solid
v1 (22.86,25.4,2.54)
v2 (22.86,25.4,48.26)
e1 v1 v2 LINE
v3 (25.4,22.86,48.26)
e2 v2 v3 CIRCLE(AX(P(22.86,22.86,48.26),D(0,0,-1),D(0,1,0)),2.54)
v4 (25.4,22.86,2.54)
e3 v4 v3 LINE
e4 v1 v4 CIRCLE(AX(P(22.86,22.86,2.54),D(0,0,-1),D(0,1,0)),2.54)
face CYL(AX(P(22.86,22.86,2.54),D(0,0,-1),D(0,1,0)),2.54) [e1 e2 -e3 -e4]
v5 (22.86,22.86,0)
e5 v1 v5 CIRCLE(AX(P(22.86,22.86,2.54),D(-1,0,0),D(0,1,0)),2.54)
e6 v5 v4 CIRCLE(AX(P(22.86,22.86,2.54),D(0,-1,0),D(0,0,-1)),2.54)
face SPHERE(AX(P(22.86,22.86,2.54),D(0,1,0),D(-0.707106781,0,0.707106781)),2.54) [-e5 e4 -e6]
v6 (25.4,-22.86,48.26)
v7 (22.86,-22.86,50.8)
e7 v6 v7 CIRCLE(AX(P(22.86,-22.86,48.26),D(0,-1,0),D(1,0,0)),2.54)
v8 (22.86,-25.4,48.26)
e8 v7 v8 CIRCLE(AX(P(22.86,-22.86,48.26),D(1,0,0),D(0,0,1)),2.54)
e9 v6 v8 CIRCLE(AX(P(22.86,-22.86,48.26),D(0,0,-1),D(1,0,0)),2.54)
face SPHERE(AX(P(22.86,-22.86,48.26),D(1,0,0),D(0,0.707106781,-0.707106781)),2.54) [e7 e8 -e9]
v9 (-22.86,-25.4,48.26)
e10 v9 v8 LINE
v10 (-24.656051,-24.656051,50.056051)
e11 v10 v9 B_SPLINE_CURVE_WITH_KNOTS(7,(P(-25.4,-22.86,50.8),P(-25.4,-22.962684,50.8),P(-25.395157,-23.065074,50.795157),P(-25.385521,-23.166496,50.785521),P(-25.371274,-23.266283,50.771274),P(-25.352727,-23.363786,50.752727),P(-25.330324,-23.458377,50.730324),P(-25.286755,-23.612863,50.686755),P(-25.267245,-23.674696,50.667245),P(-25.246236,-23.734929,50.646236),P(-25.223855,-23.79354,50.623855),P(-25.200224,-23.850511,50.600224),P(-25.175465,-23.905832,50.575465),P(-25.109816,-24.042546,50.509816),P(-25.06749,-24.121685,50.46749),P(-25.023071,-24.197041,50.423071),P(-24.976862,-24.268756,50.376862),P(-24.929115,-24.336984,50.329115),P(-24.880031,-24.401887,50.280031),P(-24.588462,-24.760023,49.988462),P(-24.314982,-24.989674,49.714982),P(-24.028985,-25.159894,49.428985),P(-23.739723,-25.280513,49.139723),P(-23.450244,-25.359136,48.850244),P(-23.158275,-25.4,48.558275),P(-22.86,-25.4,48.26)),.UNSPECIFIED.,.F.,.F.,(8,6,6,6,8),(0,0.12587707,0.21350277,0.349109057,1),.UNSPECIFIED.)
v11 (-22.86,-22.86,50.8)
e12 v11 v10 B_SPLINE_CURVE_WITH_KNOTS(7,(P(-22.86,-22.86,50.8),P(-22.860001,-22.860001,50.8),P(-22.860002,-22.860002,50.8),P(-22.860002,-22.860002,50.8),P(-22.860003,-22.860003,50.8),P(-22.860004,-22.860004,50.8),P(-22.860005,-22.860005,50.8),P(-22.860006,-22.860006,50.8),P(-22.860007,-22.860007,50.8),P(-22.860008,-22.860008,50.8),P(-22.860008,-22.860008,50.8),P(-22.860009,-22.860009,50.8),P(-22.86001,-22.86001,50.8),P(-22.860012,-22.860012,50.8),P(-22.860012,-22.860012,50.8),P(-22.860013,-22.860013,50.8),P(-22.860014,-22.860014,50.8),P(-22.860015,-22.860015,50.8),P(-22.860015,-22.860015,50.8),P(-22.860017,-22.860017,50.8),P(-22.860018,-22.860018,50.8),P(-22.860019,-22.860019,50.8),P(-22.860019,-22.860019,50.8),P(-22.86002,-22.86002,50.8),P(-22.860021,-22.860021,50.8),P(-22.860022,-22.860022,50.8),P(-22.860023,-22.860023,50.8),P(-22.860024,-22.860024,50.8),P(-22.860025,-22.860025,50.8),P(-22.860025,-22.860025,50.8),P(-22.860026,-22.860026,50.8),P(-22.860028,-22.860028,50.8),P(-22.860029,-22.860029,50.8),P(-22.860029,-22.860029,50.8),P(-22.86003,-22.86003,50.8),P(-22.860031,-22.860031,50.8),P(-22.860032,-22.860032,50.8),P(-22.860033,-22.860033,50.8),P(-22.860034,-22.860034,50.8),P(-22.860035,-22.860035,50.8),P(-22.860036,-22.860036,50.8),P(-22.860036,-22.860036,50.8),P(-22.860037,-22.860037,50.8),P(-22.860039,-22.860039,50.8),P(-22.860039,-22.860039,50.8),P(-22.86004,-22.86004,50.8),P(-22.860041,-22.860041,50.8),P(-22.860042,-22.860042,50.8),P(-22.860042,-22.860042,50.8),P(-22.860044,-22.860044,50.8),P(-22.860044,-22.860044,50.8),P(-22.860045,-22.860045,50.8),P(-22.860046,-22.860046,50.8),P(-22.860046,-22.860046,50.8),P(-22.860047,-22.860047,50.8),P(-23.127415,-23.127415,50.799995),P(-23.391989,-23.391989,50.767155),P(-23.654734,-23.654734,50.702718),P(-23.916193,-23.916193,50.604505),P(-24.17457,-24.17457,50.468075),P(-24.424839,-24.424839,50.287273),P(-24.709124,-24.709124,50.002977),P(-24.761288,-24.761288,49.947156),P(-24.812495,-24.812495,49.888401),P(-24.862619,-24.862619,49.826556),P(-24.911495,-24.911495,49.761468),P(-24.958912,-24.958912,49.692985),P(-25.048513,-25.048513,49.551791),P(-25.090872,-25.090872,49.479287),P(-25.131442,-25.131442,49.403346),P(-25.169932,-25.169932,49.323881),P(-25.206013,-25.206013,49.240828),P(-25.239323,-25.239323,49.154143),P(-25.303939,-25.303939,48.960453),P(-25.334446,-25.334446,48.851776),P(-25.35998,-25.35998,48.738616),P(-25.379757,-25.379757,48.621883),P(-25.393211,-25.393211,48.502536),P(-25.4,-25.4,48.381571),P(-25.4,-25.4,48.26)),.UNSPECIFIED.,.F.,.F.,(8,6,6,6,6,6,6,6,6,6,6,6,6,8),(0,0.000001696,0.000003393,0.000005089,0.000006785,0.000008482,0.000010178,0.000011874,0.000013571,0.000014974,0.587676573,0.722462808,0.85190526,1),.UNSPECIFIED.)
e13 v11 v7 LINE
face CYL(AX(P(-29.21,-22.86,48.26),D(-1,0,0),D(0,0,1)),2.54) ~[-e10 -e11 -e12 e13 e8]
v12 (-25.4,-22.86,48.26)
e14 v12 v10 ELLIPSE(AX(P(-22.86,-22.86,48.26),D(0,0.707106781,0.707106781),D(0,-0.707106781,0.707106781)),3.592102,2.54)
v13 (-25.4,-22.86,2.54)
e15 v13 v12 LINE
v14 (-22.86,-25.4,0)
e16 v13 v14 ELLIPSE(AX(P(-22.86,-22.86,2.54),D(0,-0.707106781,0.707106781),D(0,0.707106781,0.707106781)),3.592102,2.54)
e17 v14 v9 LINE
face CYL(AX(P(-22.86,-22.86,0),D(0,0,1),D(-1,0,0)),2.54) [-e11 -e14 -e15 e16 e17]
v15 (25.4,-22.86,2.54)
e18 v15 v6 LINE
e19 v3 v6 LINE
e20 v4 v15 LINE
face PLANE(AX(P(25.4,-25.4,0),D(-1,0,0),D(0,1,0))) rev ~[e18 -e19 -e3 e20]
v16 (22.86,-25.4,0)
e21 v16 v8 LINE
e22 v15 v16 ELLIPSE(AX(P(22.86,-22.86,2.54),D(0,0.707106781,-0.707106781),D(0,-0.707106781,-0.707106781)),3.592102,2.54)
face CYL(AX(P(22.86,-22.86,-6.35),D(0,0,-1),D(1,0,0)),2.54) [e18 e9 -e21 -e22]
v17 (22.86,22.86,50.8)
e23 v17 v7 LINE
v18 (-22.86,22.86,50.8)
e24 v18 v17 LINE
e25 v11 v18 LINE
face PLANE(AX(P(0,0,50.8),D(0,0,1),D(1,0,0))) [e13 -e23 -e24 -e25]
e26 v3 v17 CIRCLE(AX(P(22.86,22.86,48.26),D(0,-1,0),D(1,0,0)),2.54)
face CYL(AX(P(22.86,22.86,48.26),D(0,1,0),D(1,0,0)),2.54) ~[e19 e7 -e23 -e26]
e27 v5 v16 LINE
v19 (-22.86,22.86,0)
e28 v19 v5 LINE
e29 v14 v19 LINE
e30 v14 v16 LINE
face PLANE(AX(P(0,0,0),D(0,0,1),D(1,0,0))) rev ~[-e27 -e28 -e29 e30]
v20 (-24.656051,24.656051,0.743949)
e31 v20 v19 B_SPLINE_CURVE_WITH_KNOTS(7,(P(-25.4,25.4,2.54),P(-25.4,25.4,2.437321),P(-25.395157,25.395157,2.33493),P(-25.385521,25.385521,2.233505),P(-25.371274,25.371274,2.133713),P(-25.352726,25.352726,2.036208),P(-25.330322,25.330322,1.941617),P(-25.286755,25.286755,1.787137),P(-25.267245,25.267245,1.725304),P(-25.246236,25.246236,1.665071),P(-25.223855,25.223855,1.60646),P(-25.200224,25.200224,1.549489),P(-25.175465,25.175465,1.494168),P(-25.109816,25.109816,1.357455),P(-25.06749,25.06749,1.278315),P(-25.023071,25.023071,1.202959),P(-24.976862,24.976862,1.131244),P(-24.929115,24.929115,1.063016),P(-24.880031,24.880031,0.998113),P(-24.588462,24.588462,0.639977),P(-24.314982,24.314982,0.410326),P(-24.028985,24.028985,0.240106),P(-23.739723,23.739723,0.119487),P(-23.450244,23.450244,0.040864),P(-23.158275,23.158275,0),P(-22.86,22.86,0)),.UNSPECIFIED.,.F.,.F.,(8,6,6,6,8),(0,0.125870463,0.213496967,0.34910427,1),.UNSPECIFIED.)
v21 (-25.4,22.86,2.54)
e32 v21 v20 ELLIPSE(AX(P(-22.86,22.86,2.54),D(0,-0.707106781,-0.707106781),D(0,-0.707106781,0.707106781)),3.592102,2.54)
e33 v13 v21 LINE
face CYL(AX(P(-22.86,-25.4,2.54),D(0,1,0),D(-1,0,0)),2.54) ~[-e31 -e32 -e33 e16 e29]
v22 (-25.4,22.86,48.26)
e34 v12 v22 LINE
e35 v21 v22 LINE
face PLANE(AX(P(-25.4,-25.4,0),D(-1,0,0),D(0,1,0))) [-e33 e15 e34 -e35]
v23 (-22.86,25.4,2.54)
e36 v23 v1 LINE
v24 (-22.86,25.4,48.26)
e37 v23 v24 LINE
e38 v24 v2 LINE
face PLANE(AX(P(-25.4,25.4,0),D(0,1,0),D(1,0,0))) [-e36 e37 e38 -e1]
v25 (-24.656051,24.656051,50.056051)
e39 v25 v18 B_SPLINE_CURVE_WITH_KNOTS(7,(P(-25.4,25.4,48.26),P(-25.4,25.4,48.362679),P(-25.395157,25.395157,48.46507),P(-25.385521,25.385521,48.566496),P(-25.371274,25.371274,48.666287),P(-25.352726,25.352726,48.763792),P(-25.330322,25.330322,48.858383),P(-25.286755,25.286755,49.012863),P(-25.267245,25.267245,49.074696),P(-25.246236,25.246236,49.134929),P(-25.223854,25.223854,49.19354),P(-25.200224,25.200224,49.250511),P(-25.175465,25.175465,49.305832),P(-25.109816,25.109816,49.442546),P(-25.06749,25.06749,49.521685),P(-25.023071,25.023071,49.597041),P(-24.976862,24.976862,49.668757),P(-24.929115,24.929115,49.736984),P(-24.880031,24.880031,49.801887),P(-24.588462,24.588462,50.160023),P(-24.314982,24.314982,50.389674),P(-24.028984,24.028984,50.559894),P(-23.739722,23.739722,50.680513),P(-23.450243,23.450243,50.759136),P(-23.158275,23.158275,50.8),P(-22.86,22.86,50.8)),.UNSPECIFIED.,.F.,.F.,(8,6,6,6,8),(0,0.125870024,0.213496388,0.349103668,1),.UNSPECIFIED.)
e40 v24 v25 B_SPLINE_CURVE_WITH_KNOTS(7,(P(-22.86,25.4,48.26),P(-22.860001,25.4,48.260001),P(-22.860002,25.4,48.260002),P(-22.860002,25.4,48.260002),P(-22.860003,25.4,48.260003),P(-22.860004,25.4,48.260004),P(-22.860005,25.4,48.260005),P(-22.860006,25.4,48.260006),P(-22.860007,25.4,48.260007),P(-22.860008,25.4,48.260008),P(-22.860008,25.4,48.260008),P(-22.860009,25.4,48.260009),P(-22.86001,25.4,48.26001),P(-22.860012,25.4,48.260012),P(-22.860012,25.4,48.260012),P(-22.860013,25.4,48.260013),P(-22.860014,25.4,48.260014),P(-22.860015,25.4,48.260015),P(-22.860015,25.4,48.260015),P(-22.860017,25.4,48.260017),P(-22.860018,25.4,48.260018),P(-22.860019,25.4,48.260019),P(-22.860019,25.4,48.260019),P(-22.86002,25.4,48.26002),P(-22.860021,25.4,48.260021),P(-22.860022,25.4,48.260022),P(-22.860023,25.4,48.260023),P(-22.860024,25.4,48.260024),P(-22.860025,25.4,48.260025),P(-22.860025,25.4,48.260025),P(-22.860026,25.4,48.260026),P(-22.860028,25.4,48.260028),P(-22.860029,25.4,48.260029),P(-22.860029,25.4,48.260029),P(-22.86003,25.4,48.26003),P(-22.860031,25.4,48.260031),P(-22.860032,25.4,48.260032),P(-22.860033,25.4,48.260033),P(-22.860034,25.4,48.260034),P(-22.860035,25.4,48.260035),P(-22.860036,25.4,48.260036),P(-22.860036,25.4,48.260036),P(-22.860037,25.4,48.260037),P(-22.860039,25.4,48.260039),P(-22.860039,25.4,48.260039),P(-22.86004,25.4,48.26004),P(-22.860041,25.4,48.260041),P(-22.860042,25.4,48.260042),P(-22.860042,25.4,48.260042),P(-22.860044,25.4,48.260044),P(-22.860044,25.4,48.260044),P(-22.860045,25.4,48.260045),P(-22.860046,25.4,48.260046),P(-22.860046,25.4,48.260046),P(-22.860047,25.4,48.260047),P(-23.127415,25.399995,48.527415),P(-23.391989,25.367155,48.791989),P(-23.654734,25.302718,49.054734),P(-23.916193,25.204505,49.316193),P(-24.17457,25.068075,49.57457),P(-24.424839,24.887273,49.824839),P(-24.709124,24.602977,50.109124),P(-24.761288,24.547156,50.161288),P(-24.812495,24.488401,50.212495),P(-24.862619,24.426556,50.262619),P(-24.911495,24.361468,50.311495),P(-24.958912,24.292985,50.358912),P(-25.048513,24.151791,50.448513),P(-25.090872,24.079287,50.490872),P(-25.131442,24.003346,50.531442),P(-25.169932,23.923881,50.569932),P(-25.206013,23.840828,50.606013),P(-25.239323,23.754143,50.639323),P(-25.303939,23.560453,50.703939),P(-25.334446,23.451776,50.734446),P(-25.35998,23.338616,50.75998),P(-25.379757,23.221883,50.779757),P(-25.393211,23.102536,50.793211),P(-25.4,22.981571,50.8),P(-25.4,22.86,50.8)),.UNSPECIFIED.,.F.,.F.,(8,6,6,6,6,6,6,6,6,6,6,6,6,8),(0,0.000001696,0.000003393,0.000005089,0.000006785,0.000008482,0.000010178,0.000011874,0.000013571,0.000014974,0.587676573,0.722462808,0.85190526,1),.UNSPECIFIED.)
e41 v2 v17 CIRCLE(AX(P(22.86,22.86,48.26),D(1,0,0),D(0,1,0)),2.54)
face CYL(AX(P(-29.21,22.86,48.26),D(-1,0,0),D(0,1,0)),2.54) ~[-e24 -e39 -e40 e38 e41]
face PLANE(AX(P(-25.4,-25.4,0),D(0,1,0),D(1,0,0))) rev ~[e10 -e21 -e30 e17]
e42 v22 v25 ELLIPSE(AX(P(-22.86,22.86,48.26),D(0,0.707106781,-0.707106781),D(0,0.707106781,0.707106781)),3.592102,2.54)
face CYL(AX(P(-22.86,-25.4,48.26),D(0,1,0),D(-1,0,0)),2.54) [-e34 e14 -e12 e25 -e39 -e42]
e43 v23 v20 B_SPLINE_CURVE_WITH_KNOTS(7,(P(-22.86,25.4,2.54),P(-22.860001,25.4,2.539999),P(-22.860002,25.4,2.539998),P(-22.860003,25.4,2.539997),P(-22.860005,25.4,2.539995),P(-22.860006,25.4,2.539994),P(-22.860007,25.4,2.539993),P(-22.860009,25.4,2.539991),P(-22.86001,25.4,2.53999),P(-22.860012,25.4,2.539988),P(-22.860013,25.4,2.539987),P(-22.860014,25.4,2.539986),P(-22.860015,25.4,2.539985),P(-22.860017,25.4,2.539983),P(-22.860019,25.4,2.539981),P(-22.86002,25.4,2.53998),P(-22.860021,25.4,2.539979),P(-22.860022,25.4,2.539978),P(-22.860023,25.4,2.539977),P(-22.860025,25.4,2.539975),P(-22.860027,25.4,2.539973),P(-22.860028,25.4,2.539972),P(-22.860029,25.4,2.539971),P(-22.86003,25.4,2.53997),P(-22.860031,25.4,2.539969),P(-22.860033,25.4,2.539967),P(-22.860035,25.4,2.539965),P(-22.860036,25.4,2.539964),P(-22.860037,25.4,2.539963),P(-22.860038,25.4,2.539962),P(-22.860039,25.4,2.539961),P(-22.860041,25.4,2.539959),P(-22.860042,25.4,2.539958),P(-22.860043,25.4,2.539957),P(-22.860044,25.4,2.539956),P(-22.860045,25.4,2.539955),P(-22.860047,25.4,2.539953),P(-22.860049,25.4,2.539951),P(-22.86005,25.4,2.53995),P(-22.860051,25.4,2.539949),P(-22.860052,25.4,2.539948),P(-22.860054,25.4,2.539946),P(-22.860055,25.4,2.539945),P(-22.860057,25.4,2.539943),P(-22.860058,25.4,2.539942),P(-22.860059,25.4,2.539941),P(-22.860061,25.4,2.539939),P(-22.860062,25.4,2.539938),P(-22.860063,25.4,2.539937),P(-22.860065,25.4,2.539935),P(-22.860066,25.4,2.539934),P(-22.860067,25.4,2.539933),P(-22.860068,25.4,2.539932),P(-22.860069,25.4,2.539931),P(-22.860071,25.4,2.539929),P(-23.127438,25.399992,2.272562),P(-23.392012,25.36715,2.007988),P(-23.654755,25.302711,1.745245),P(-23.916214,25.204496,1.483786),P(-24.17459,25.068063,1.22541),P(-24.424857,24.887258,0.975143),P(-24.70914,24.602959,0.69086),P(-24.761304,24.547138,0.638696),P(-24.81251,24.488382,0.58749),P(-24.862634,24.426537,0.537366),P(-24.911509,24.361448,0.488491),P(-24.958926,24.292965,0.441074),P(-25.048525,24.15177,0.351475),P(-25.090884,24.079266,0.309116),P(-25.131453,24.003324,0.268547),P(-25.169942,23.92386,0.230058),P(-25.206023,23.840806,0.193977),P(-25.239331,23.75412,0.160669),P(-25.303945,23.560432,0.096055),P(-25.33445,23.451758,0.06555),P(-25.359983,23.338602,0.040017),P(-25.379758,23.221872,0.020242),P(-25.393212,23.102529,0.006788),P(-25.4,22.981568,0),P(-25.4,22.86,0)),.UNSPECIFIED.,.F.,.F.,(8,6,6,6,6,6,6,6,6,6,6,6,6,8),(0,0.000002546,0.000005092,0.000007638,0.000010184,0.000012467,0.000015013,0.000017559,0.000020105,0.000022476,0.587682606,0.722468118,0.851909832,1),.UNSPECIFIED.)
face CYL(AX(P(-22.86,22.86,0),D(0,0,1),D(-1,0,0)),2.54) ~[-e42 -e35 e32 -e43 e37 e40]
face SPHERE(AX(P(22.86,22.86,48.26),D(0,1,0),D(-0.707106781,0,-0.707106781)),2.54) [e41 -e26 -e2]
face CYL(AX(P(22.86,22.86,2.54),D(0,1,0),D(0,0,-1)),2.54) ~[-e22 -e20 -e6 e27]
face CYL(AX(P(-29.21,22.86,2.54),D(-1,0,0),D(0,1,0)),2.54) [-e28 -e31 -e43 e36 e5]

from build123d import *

# Parameters (mm, degrees)
F0_W         = 50.8
F0_H         = 50.8
F1_DEPTH     = 50.8
F2_R         = 2.54
F3_T1_DEPTH  = 52.07
F3_T3_DEPTH  = 45.72
F3_T5_DEPTH  = 54.61
F3_T7_DEPTH  = 45.72
F3_T9_DEPTH  = 54.61
F3_S13_W     = 2.5908
F3_S13_H     = 2.5908
F3_T14_DEPTH = 2.5908
F3_S19_W     = 2.5908
F3_S19_H     = 2.5908
F3_T20_DEPTH = 2.5908
F3_S25_W     = 2.5908
F3_S25_H     = 2.5908
F3_T26_DEPTH = 2.5908


# Not quite as in the source:
# - a fillet or chamfer that OpenCascade refuses, or shapes differently, is made with other operations: its cross-section is extruded or revolved along the edge and cut away or added


with BuildPart() as f1:
    # F0 (on Top) → F1 (new body)
    with BuildSketch(Plane.XY):
        Rectangle(F0_W, F0_H)
    extrude(amount=F1_DEPTH)

    # F2
    f2_edges = [f1.edges().sort_by_distance(p)[0] for p in [
        (-25.4, 25.4, 25.4),
        (-25.4, -25.4, 25.4),
        (-25.4, 0, 0),
        (-25.4, 0, 50.8),
    ]]
    fillet(f2_edges, radius=F2_R)

    # F3: fillet of radius 2.54 on 9 edges, made by hand

    # F3_s2 → F3_t1 (cut)
    with BuildSketch(Plane.YZ.offset(-29.21)):
        with BuildLine():
            ThreePointArc((25.4, 48.26), (24.6560512242, 50.0560512242), (22.86, 50.8))
            Line((22.86, 50.8), (25.4, 50.8))
            Line((25.4, 50.8), (25.4, 48.26))
        make_face()
        with BuildLine():
            ThreePointArc((-22.86, 50.8), (-24.6560512242, 50.0560512242), (-25.4, 48.26))
            Line((-25.4, 48.26), (-25.4, 50.8))
            Line((-25.4, 50.8), (-22.86, 50.8))
        make_face()
        with BuildLine():
            ThreePointArc((25.4, 2.54), (24.6560512242, 0.7439487758), (22.86, 0))
            Line((22.86, 0), (25.4, 0))
            Line((25.4, 0), (25.4, 2.54))
        make_face()
    extrude(amount=F3_T1_DEPTH, mode=Mode.SUBTRACT)

    # F3_s4 → F3_t3 (cut)
    with BuildSketch(Plane.XZ.offset(-22.86)):
        with BuildLine():
            ThreePointArc((25.4, 48.26), (24.6560512242, 50.0560512242), (22.86, 50.8))
            Line((22.86, 50.8), (25.4, 50.8))
            Line((25.4, 50.8), (25.4, 48.26))
        make_face()
    extrude(amount=F3_T3_DEPTH, mode=Mode.SUBTRACT)

    # F3_s6 → F3_t5 (cut)
    with BuildSketch(Plane.XY.offset(-6.35)):
        with BuildLine():
            ThreePointArc((25.4, -22.86), (24.6560512242, -24.6560512242), (22.86, -25.4))
            Line((22.86, -25.4), (25.4, -25.4))
            Line((25.4, -25.4), (25.4, -22.86))
        make_face()
    extrude(amount=F3_T5_DEPTH, mode=Mode.SUBTRACT)

    # F3_s8 → F3_t7 (cut)
    with BuildSketch(Plane.XY.offset(2.54)):
        with BuildLine():
            ThreePointArc((22.86, 25.4), (24.6560512242, 24.6560512242), (25.4, 22.86))
            Line((25.4, 22.86), (25.4, 25.4))
            Line((25.4, 25.4), (22.86, 25.4))
        make_face()
    extrude(amount=F3_T7_DEPTH, mode=Mode.SUBTRACT)

    # F3_s10 → F3_t9 (cut)
    with BuildSketch(Plane.XZ.offset(-22.86)):
        with BuildLine():
            ThreePointArc((22.86, 0), (24.6560512242, 0.7439487758), (25.4, 2.54))
            Line((25.4, 2.54), (25.4, 0))
            Line((25.4, 0), (22.86, 0))
        make_face()
    extrude(amount=F3_T9_DEPTH, mode=Mode.SUBTRACT)


with BuildPart() as f3_tool12:
    # F3_s13 → F3_t14 (new body)
    with BuildSketch(Plane.XZ.offset(-22.86)):
        with Locations((24.1554, 49.5554)):
            Rectangle(F3_S13_W, F3_S13_H)
    extrude(amount=-F3_T14_DEPTH)

    # F3_s15 → F3_t16 (revolve, cut)
    with BuildSketch(Plane(origin=(22.86, 22.86, 48.26), x_dir=(-0.7071067812, 0, -0.7071067812), z_dir=(0.7071067812, 0, -0.7071067812))):
        with BuildLine():
            ThreePointArc((0, -2.54), (2.54, 0), (0, 2.54))
            Line((0, 2.54), (0, -2.54))
        make_face()
    revolve(axis=Axis((22.86, 22.86, 48.26), (0, 1, 0)), mode=Mode.SUBTRACT)


with BuildPart() as f1_1:
    add(f1.part)

    # F3_t11: cut F3_tool12
    add(f3_tool12.part, mode=Mode.SUBTRACT)


with BuildPart() as f3_tool18:
    # F3_s19 → F3_t20 (new body)
    with BuildSketch(Plane.YZ.offset(22.86)):
        with Locations((-24.1554, 49.5554)):
            Rectangle(F3_S19_W, F3_S19_H)
    extrude(amount=F3_T20_DEPTH)

    # F3_s21 → F3_t22 (revolve, cut)
    with BuildSketch(Plane(origin=(22.86, -22.86, 48.26), x_dir=(0, 0.7071067812, -0.7071067812), z_dir=(0, -0.7071067812, -0.7071067812))):
        with BuildLine():
            ThreePointArc((0, -2.54), (2.54, 0), (0, 2.54))
            Line((0, 2.54), (0, -2.54))
        make_face()
    revolve(axis=Axis((22.86, -22.86, 48.26), (1, 0, 0)), mode=Mode.SUBTRACT)


with BuildPart() as f1_2:
    add(f1_1.part)

    # F3_t17: cut F3_tool18
    add(f3_tool18.part, mode=Mode.SUBTRACT)


with BuildPart() as f3_tool24:
    # F3_s25 → F3_t26 (new body)
    with BuildSketch(Plane.XZ.offset(-22.86)):
        with Locations((24.1554, 1.2446)):
            Rectangle(F3_S25_W, F3_S25_H)
    extrude(amount=-F3_T26_DEPTH)

    # F3_s27 → F3_t28 (revolve, cut)
    with BuildSketch(Plane(origin=(22.86, 22.86, 2.54), x_dir=(-0.7071067812, 0, 0.7071067812), z_dir=(-0.7071067812, 0, -0.7071067812))):
        with BuildLine():
            ThreePointArc((0, -2.54), (2.54, 0), (0, 2.54))
            Line((0, 2.54), (0, -2.54))
        make_face()
    revolve(axis=Axis((22.86, 22.86, 2.54), (0, 1, 0)), mode=Mode.SUBTRACT)


with BuildPart() as f1_3:
    add(f1_2.part)

    # F3_t23: cut F3_tool24
    add(f3_tool24.part, mode=Mode.SUBTRACT)


solid = f1_3.part
